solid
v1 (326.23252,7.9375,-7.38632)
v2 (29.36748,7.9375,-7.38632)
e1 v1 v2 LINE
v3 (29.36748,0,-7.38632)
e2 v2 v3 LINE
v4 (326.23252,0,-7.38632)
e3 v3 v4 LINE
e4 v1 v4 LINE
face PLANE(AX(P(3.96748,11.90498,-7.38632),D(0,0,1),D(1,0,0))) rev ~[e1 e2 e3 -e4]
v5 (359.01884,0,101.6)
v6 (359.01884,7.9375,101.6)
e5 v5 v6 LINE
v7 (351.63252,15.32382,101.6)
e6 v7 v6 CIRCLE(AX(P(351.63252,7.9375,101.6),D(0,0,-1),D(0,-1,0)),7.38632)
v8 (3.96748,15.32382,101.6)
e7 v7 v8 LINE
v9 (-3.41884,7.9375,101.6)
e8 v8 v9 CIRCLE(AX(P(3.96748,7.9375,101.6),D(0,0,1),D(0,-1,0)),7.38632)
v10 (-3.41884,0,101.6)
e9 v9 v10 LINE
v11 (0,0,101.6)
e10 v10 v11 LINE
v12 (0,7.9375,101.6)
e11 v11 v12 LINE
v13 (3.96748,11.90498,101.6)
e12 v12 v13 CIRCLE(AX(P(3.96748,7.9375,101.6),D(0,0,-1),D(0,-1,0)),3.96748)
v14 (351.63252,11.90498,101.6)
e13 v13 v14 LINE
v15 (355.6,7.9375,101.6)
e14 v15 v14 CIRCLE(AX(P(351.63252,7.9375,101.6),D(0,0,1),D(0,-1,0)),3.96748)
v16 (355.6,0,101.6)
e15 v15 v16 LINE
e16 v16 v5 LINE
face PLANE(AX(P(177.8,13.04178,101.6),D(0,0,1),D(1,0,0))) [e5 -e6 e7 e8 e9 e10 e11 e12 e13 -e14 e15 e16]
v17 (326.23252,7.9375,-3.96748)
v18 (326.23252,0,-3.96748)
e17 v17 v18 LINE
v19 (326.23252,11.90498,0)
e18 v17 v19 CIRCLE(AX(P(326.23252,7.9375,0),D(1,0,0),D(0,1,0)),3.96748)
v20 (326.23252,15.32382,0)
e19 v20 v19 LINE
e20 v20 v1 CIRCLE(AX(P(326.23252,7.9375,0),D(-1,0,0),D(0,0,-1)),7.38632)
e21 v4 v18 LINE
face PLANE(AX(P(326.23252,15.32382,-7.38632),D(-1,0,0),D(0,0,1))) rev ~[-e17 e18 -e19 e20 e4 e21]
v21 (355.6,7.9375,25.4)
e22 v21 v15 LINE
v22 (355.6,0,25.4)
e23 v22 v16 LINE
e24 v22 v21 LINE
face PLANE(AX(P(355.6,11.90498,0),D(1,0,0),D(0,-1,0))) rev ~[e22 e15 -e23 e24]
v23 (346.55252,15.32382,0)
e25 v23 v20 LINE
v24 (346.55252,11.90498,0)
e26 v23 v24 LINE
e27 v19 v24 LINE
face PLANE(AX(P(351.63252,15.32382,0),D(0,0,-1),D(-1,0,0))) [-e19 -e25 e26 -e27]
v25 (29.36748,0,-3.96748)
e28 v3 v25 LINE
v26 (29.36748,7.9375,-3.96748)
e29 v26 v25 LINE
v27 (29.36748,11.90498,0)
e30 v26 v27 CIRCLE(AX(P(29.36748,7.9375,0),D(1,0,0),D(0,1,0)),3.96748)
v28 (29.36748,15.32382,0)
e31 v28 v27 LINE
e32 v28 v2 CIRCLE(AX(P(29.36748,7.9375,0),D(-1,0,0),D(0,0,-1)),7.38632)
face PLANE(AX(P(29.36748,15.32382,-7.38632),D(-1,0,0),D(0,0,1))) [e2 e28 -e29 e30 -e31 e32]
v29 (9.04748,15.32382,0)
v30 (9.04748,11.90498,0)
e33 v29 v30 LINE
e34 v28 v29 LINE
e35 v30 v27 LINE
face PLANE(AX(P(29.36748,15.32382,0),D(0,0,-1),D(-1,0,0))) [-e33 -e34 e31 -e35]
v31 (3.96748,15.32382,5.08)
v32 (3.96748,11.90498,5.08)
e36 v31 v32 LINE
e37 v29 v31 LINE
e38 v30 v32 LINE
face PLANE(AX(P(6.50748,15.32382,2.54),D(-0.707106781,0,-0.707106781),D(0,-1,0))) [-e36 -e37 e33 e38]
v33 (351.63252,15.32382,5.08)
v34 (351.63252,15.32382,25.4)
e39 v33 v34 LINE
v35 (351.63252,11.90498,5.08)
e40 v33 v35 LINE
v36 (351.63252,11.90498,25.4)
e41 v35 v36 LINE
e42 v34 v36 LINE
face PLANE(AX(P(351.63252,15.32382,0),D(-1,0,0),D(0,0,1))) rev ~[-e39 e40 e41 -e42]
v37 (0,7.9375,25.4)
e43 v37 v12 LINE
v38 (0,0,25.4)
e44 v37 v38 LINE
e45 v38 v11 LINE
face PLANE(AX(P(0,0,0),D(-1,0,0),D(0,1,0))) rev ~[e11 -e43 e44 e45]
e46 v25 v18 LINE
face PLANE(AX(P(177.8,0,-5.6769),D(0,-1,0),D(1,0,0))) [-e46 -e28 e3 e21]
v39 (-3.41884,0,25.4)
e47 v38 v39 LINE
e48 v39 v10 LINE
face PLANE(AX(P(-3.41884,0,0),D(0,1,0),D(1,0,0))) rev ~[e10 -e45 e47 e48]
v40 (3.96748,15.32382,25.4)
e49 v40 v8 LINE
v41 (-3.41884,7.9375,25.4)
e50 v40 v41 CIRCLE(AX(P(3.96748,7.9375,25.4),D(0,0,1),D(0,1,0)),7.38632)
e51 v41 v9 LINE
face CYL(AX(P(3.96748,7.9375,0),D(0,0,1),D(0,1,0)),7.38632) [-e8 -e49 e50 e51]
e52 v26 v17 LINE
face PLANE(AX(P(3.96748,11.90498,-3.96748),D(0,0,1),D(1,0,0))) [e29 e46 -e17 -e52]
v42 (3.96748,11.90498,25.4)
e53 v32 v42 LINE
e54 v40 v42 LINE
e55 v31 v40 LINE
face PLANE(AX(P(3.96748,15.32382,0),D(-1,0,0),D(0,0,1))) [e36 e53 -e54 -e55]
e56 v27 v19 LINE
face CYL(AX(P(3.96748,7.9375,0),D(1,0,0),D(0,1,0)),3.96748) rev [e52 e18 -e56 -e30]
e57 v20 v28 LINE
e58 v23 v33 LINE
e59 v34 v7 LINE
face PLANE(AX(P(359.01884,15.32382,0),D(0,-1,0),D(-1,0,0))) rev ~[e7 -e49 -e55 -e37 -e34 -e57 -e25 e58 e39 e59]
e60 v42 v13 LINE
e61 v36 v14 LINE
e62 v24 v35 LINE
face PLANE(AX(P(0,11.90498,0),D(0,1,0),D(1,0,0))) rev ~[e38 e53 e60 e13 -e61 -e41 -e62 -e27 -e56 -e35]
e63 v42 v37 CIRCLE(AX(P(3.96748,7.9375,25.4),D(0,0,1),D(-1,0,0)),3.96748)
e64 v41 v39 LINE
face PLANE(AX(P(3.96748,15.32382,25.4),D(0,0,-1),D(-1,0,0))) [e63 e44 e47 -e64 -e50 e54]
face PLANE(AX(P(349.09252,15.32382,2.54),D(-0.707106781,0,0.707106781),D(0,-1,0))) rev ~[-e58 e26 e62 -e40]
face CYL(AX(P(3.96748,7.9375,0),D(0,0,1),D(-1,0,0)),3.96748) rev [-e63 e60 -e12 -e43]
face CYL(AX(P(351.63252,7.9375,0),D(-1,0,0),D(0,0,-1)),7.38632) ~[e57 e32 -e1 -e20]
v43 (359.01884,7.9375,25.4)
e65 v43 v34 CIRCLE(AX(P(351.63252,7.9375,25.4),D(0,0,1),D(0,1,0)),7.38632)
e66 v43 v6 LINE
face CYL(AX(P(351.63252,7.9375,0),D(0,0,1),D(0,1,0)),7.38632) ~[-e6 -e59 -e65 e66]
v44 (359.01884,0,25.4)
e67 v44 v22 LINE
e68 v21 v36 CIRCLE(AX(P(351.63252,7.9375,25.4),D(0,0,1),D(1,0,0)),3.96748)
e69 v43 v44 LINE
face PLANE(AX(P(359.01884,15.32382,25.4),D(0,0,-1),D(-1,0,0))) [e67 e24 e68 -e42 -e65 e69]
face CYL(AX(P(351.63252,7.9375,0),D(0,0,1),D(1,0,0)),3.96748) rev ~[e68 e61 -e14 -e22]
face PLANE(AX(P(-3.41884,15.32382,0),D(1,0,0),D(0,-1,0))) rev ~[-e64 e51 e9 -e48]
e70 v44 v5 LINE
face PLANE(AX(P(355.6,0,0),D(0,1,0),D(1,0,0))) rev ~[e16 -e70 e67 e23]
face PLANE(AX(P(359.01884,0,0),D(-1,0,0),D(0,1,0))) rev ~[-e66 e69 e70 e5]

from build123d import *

# Parameters (mm, degrees)
F1_DEPTH = 101.6
F2_W     = 347.66504
F2_H     = 7.38632
F3_DEPTH = 3.41884
F4_W     = 347.66504
F4_H     = 3.41884
F5_DEPTH = 11.90498
F6_R     = 3.96748
F7_R     = 7.38632
F8_W     = 7.38632
F8_H     = 25.4
F8_W_2   = 25.4
F8_H_2   = 7.38632
F9_DEPTH = 15.32382
F10_SIZE = 5.08


# Not quite as in the source:
# - a feature names something its author has since deleted; it is built from what else it names


with BuildPart() as f1:
    # F0 (on Top) → F1 (new body)
    with BuildSketch(Plane.XY):
        Polygon((-3.41884, 0), (0, 0), (0, 11.90498), (355.6, 11.90498), (355.6, 0), (359.01884, 0), (359.01884, 15.32382), (-3.41884, 15.32382), align=None)
    extrude(amount=F1_DEPTH)

    # F2 (on face) → F3 (join, through all)
    with BuildSketch(Plane(origin=(0, 15.32382, 0), x_dir=(-1, 0, 0), z_dir=(0, 1, 0))):
        with Locations((-177.8, -3.69316)):
            Rectangle(F2_W, F2_H)
    extrude(amount=-F3_DEPTH)

    # F4 (on face) → F5 (join, through all)
    with BuildSketch(Plane.XZ.offset(-11.90498)):
        with Locations((177.8, -5.6769)):
            Rectangle(F4_W, F4_H)
    extrude(amount=F5_DEPTH)

    # F6
    f6_edges = [f1.edges().sort_by_distance(p)[0] for p in [
        (0, 11.90498, 50.8),
        (355.6, 11.90498, 50.8),
        (177.8, 11.90498, -3.96748),
    ]]
    fillet(f6_edges, radius=F6_R)

    # F7
    f7_edges = [f1.edges().sort_by_distance(p)[0] for p in [
        (-3.41884, 15.32382, 50.8),
        (359.01884, 15.32382, 50.8),
        (177.8, 15.32382, -7.38632),
    ]]
    fillet(f7_edges, radius=F7_R)

    # F8 (on face) → F9 (cut, through all)
    with BuildSketch(Plane(origin=(0, 15.32382, 0), x_dir=(-1, 0, 0), z_dir=(0, 1, 0))):
        with Locations((-355.32568, 12.7)):
            Rectangle(F8_W, F8_H)
        with Locations((-338.93252, -3.69316)):
            Rectangle(F8_W_2, F8_H_2)
        with Locations((-0.27432, 12.7)):
            Rectangle(F8_W, F8_H)
        with Locations((-16.66748, -3.69316)):
            Rectangle(F8_W_2, F8_H_2)
    extrude(amount=-F9_DEPTH, mode=Mode.SUBTRACT)

    # F10
    f10_edges = [f1.edges().sort_by_distance(p)[0] for p in [
        (351.63252, 13.6144, 0),
        (3.96748, 13.6144, 0),
    ]]
    chamfer(f10_edges, length=F10_SIZE)


solid = f1.part
